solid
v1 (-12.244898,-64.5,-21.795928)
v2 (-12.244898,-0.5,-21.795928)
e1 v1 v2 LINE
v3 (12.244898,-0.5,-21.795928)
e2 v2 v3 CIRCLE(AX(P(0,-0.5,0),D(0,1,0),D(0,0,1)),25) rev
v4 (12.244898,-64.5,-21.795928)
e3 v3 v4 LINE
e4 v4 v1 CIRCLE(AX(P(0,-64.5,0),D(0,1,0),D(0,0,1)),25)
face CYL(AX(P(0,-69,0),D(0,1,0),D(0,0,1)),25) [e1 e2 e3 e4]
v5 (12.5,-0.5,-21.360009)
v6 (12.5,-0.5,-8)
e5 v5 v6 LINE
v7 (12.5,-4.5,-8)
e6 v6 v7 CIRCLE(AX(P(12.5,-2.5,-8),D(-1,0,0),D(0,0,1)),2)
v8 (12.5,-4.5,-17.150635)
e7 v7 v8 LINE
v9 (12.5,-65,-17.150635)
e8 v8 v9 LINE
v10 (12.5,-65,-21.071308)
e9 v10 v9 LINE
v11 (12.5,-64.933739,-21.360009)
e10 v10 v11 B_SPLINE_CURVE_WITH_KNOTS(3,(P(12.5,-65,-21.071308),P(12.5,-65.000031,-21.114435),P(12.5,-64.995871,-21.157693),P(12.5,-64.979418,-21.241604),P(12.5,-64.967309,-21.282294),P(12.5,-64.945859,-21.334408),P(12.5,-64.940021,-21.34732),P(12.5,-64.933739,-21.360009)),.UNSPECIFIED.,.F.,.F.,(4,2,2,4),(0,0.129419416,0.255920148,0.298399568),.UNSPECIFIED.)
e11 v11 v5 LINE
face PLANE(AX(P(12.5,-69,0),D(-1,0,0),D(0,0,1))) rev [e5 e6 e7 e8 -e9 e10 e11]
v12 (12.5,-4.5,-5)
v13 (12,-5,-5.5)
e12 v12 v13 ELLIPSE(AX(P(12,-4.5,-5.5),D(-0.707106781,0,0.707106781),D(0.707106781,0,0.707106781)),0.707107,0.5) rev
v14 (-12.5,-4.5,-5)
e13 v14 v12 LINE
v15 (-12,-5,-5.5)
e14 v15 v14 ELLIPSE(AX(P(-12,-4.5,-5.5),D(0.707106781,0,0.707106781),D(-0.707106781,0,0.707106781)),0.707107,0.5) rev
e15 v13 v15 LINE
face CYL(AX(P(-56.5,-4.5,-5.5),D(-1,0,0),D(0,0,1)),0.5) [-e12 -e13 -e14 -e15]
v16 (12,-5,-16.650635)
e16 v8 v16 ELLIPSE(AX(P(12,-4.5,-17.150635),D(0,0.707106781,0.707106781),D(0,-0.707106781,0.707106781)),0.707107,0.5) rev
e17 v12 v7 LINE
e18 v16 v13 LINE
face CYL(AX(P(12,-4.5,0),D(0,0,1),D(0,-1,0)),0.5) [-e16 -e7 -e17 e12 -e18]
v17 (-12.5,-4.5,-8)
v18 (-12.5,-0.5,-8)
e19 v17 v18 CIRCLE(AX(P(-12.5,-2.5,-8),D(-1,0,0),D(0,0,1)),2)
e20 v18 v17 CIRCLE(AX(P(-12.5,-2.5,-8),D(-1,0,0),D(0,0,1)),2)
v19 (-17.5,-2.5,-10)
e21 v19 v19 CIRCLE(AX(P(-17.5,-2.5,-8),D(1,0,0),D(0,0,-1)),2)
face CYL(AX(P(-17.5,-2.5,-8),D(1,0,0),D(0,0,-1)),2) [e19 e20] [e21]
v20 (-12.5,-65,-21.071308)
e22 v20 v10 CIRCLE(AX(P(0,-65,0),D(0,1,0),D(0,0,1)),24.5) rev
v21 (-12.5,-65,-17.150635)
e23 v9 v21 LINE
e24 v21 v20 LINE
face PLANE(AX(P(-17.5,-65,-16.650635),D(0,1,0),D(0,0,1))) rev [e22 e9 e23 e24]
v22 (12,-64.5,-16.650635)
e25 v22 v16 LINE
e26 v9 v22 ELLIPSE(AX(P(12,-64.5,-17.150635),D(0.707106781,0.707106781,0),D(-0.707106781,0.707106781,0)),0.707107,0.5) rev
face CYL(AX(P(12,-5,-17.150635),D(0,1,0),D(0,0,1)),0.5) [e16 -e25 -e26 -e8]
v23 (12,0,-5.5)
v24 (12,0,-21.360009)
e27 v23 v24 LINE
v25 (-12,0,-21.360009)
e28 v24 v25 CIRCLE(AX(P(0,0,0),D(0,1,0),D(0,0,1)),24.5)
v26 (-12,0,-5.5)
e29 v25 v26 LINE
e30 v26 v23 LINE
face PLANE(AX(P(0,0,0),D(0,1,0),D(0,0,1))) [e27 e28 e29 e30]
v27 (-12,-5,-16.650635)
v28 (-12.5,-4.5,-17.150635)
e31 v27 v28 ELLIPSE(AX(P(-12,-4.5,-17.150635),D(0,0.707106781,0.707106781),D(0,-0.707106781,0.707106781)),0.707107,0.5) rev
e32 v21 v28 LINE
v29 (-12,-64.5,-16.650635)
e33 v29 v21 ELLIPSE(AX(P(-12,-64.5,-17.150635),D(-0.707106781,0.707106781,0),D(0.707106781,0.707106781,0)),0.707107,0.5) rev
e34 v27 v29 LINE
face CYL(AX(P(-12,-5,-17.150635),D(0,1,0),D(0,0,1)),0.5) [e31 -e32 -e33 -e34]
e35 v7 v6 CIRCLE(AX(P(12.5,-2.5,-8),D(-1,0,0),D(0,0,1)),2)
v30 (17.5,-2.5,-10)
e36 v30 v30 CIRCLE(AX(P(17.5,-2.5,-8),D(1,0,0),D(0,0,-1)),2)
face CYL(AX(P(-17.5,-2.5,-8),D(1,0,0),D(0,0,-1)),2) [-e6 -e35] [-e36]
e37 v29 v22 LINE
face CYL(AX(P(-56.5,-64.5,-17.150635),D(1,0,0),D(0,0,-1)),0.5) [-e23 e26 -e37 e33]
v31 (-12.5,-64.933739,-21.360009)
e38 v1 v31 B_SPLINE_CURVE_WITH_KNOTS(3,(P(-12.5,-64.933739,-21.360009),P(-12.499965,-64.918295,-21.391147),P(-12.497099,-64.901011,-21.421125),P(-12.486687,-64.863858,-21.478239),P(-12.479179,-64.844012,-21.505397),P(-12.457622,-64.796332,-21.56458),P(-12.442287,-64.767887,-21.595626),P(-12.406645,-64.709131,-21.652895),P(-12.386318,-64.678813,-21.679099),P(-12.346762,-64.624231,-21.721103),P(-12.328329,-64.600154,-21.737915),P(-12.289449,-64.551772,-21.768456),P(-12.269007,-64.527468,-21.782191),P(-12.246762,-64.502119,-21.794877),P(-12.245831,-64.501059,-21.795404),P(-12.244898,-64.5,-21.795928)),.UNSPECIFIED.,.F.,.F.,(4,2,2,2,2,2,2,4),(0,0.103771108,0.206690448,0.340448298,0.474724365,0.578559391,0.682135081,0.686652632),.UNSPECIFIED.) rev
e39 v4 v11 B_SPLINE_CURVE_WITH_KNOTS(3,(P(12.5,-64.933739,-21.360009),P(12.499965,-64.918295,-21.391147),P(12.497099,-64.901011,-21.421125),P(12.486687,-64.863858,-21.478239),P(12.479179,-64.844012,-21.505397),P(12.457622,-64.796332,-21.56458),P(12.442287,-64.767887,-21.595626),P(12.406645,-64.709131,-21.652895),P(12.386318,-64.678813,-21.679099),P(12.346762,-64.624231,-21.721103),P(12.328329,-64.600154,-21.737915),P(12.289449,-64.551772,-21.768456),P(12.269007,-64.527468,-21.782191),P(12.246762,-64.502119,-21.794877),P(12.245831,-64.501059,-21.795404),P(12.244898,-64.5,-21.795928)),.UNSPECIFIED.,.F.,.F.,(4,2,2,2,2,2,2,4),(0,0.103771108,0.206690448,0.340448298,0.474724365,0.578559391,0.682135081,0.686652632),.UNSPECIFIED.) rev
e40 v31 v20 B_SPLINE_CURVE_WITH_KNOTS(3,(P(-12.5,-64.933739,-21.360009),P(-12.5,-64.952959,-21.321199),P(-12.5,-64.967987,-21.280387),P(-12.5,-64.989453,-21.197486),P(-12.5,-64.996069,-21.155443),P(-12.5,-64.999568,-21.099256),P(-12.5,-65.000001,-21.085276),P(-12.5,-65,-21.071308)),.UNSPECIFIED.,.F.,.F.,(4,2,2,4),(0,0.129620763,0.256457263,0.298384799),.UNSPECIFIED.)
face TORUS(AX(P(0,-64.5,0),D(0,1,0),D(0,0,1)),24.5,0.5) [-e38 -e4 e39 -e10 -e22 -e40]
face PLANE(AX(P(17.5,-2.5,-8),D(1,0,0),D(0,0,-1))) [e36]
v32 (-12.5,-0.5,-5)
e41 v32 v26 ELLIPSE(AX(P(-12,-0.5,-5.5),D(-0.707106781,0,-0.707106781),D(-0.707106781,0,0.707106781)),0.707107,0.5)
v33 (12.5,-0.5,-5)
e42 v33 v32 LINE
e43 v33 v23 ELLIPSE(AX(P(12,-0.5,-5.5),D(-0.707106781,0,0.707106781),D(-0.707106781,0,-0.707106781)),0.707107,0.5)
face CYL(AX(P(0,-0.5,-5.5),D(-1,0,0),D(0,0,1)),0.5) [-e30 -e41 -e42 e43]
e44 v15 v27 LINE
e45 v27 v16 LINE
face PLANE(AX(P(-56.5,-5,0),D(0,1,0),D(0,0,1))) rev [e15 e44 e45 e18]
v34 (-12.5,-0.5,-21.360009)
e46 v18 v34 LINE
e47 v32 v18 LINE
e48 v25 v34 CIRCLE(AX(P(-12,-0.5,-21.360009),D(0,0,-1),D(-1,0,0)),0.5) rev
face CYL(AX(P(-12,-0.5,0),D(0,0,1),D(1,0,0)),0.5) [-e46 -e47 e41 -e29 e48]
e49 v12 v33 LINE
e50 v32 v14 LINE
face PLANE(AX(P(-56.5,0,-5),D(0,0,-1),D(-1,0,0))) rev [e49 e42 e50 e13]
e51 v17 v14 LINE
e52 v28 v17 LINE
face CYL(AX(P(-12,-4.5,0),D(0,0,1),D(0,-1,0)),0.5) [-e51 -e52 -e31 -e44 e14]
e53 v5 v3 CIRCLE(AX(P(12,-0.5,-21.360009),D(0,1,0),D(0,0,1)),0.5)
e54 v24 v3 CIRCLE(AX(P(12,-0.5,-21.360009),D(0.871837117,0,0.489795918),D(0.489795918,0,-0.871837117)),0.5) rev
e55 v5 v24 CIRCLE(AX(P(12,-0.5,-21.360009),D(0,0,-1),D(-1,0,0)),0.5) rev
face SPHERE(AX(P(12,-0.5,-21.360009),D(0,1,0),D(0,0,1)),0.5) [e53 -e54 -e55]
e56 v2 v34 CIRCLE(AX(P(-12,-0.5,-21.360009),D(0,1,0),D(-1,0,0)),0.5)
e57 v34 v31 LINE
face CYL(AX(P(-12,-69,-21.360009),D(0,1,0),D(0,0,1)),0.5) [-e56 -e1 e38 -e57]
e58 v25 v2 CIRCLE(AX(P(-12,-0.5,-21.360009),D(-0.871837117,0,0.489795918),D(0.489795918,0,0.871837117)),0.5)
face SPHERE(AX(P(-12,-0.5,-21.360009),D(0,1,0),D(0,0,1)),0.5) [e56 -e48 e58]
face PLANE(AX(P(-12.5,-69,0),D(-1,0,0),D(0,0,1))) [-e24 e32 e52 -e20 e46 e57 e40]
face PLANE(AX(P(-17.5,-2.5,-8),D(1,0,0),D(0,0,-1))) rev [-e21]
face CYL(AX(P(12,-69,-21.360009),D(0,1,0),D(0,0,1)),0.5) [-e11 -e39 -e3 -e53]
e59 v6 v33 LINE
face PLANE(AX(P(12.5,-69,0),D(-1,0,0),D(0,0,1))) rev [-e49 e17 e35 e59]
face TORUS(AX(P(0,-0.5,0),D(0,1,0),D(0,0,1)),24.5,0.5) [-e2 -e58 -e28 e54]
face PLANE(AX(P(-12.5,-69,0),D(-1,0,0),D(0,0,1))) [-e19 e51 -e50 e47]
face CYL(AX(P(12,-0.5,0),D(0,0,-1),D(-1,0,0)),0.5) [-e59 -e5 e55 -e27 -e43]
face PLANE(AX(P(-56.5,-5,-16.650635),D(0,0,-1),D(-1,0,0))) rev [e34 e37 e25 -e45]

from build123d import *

# Parameters (mm, degrees)
SKETCH1_R                = 25
BOSS_EXTRUDE1_DEPTH      = 69
CUT_EXTRUDE3_DEPTH       = 69
SKETCH8_W                = 47.613521064
SKETCH8_H                = 96.094714493
CUT_EXTRUDE6_DEPTH       = 69
SKETCH9_W                = 16.650635095
SKETCH9_H                = 64
CUT_EXTRUDE7_DEPTH       = 69
SKETCH10_W               = 5
SKETCH10_H               = 9.23187044
CUT_EXTRUDE8_DEPTH       = 69
BOSS_EXTRUDE2_DEPTH      = 5
BOSS_EXTRUDE2_DEPTH_BACK = 30
SKETCH11_R               = 2
SKETCH12_W               = 21.924143589
SKETCH12_H               = 4
CUT_EXTRUDE9_DEPTH       = 80.284298572
FILLET1_R                = 0.5


with BuildPart() as part:
    # Sketch1 → Boss-Extrude1 (new body)
    with BuildSketch(Plane(origin=(0, 0, 0), x_dir=(1, 0, 0), z_dir=(0, 1, 0))):
        with Locations(Location((0, 0, 0), (0, 0, 270))):
            Circle(SKETCH1_R)
    extrude(amount=-BOSS_EXTRUDE1_DEPTH)

    # Sketch2 → Cut-Extrude3 (cut)
    with BuildSketch(Plane(origin=(0, 0, 0), x_dir=(1, 0, 0), z_dir=(0, 1, 0))):
        with BuildLine():
            Line((-12.5, -21.650635095), (-12.5, 21.650635095))
            ThreePointArc((-12.5, 21.650635095), (-25, 0), (-12.5, -21.650635095))
        make_face()
        with BuildLine():
            ThreePointArc((25, 0), (21.650635095, 12.5), (12.5, 21.650635095))
            Line((12.5, 21.650635095), (12.5, -21.650635095))
            ThreePointArc((12.5, -21.650635095), (21.650635095, -12.5), (25, 0))
        make_face()
    extrude(amount=-CUT_EXTRUDE3_DEPTH, mode=Mode.SUBTRACT)

    # Sketch8 → Cut-Extrude6 (cut)
    with BuildSketch(Plane(origin=(12.5, 0, 0), x_dir=(0, 0, -1), z_dir=(1, 0, 0))):
        with Locations((-23.806760532, -34.608459046)):
            Rectangle(SKETCH8_W, SKETCH8_H)
    extrude(amount=-CUT_EXTRUDE6_DEPTH, mode=Mode.SUBTRACT)

    # Sketch9 → Cut-Extrude7 (cut)
    with BuildSketch(Plane(origin=(12.5, 0, 0), x_dir=(0, 0, -1), z_dir=(1, 0, 0))):
        with Locations((8.325317548, -37)):
            Rectangle(SKETCH9_W, SKETCH9_H)
    extrude(amount=-CUT_EXTRUDE7_DEPTH, mode=Mode.SUBTRACT)

    # Sketch10 → Cut-Extrude8 (cut)
    with BuildSketch(Plane(origin=(12.5, 0, 0), x_dir=(0, 0, -1), z_dir=(1, 0, 0))):
        with Locations((2.5, -4.61593522)):
            Rectangle(SKETCH10_W, SKETCH10_H)
    extrude(amount=-CUT_EXTRUDE8_DEPTH, mode=Mode.SUBTRACT)

    # Sketch11 → Boss-Extrude2 (add, two sides: drawn at the far end of the back side and taken through both)
    with BuildSketch(Plane(origin=(12.5, 0, 0), x_dir=(0, 0, -1), z_dir=(1, 0, 0)).offset(-BOSS_EXTRUDE2_DEPTH_BACK)):
        with Locations((8, -2.5)):
            Circle(SKETCH11_R)
    extrude(amount=BOSS_EXTRUDE2_DEPTH + BOSS_EXTRUDE2_DEPTH_BACK)

    # Sketch12 → Cut-Extrude9 (cut, through all)
    with BuildSketch(Plane(origin=(12.5, 0, 0), x_dir=(0, 0, -1), z_dir=(1, 0, 0))):
        with Locations((27.61270689, -67)):
            Rectangle(SKETCH12_W, SKETCH12_H)
    extrude(amount=-CUT_EXTRUDE9_DEPTH, mode=Mode.SUBTRACT)

    # Fillet1
    fillet1_edges = [part.edges().sort_by_distance(p)[0] for p in [
        (12.5, -35, -16.650635095),
        (0, -65, -16.650635095),
        (-12.5, -32.5, -21.650635095),
        (12.5, -32.5, -21.650635095),
        (0, -65, -25),
        (-12.5, 0, -13.325317547),
        (12.5, 0, -13.325317547),
        (-12.5, -35, -16.650635095),
        (12.5, -5, -10.825317547),
        (0, 0, -25),
        (-12.5, -5, -10.825317547),
        (0, -5, -5),
        (0, 0, -5),
    ]]
    fillet(fillet1_edges, radius=FILLET1_R - 0.0001)  # a hair under: the kernel refuses the full size


solid = part.part
